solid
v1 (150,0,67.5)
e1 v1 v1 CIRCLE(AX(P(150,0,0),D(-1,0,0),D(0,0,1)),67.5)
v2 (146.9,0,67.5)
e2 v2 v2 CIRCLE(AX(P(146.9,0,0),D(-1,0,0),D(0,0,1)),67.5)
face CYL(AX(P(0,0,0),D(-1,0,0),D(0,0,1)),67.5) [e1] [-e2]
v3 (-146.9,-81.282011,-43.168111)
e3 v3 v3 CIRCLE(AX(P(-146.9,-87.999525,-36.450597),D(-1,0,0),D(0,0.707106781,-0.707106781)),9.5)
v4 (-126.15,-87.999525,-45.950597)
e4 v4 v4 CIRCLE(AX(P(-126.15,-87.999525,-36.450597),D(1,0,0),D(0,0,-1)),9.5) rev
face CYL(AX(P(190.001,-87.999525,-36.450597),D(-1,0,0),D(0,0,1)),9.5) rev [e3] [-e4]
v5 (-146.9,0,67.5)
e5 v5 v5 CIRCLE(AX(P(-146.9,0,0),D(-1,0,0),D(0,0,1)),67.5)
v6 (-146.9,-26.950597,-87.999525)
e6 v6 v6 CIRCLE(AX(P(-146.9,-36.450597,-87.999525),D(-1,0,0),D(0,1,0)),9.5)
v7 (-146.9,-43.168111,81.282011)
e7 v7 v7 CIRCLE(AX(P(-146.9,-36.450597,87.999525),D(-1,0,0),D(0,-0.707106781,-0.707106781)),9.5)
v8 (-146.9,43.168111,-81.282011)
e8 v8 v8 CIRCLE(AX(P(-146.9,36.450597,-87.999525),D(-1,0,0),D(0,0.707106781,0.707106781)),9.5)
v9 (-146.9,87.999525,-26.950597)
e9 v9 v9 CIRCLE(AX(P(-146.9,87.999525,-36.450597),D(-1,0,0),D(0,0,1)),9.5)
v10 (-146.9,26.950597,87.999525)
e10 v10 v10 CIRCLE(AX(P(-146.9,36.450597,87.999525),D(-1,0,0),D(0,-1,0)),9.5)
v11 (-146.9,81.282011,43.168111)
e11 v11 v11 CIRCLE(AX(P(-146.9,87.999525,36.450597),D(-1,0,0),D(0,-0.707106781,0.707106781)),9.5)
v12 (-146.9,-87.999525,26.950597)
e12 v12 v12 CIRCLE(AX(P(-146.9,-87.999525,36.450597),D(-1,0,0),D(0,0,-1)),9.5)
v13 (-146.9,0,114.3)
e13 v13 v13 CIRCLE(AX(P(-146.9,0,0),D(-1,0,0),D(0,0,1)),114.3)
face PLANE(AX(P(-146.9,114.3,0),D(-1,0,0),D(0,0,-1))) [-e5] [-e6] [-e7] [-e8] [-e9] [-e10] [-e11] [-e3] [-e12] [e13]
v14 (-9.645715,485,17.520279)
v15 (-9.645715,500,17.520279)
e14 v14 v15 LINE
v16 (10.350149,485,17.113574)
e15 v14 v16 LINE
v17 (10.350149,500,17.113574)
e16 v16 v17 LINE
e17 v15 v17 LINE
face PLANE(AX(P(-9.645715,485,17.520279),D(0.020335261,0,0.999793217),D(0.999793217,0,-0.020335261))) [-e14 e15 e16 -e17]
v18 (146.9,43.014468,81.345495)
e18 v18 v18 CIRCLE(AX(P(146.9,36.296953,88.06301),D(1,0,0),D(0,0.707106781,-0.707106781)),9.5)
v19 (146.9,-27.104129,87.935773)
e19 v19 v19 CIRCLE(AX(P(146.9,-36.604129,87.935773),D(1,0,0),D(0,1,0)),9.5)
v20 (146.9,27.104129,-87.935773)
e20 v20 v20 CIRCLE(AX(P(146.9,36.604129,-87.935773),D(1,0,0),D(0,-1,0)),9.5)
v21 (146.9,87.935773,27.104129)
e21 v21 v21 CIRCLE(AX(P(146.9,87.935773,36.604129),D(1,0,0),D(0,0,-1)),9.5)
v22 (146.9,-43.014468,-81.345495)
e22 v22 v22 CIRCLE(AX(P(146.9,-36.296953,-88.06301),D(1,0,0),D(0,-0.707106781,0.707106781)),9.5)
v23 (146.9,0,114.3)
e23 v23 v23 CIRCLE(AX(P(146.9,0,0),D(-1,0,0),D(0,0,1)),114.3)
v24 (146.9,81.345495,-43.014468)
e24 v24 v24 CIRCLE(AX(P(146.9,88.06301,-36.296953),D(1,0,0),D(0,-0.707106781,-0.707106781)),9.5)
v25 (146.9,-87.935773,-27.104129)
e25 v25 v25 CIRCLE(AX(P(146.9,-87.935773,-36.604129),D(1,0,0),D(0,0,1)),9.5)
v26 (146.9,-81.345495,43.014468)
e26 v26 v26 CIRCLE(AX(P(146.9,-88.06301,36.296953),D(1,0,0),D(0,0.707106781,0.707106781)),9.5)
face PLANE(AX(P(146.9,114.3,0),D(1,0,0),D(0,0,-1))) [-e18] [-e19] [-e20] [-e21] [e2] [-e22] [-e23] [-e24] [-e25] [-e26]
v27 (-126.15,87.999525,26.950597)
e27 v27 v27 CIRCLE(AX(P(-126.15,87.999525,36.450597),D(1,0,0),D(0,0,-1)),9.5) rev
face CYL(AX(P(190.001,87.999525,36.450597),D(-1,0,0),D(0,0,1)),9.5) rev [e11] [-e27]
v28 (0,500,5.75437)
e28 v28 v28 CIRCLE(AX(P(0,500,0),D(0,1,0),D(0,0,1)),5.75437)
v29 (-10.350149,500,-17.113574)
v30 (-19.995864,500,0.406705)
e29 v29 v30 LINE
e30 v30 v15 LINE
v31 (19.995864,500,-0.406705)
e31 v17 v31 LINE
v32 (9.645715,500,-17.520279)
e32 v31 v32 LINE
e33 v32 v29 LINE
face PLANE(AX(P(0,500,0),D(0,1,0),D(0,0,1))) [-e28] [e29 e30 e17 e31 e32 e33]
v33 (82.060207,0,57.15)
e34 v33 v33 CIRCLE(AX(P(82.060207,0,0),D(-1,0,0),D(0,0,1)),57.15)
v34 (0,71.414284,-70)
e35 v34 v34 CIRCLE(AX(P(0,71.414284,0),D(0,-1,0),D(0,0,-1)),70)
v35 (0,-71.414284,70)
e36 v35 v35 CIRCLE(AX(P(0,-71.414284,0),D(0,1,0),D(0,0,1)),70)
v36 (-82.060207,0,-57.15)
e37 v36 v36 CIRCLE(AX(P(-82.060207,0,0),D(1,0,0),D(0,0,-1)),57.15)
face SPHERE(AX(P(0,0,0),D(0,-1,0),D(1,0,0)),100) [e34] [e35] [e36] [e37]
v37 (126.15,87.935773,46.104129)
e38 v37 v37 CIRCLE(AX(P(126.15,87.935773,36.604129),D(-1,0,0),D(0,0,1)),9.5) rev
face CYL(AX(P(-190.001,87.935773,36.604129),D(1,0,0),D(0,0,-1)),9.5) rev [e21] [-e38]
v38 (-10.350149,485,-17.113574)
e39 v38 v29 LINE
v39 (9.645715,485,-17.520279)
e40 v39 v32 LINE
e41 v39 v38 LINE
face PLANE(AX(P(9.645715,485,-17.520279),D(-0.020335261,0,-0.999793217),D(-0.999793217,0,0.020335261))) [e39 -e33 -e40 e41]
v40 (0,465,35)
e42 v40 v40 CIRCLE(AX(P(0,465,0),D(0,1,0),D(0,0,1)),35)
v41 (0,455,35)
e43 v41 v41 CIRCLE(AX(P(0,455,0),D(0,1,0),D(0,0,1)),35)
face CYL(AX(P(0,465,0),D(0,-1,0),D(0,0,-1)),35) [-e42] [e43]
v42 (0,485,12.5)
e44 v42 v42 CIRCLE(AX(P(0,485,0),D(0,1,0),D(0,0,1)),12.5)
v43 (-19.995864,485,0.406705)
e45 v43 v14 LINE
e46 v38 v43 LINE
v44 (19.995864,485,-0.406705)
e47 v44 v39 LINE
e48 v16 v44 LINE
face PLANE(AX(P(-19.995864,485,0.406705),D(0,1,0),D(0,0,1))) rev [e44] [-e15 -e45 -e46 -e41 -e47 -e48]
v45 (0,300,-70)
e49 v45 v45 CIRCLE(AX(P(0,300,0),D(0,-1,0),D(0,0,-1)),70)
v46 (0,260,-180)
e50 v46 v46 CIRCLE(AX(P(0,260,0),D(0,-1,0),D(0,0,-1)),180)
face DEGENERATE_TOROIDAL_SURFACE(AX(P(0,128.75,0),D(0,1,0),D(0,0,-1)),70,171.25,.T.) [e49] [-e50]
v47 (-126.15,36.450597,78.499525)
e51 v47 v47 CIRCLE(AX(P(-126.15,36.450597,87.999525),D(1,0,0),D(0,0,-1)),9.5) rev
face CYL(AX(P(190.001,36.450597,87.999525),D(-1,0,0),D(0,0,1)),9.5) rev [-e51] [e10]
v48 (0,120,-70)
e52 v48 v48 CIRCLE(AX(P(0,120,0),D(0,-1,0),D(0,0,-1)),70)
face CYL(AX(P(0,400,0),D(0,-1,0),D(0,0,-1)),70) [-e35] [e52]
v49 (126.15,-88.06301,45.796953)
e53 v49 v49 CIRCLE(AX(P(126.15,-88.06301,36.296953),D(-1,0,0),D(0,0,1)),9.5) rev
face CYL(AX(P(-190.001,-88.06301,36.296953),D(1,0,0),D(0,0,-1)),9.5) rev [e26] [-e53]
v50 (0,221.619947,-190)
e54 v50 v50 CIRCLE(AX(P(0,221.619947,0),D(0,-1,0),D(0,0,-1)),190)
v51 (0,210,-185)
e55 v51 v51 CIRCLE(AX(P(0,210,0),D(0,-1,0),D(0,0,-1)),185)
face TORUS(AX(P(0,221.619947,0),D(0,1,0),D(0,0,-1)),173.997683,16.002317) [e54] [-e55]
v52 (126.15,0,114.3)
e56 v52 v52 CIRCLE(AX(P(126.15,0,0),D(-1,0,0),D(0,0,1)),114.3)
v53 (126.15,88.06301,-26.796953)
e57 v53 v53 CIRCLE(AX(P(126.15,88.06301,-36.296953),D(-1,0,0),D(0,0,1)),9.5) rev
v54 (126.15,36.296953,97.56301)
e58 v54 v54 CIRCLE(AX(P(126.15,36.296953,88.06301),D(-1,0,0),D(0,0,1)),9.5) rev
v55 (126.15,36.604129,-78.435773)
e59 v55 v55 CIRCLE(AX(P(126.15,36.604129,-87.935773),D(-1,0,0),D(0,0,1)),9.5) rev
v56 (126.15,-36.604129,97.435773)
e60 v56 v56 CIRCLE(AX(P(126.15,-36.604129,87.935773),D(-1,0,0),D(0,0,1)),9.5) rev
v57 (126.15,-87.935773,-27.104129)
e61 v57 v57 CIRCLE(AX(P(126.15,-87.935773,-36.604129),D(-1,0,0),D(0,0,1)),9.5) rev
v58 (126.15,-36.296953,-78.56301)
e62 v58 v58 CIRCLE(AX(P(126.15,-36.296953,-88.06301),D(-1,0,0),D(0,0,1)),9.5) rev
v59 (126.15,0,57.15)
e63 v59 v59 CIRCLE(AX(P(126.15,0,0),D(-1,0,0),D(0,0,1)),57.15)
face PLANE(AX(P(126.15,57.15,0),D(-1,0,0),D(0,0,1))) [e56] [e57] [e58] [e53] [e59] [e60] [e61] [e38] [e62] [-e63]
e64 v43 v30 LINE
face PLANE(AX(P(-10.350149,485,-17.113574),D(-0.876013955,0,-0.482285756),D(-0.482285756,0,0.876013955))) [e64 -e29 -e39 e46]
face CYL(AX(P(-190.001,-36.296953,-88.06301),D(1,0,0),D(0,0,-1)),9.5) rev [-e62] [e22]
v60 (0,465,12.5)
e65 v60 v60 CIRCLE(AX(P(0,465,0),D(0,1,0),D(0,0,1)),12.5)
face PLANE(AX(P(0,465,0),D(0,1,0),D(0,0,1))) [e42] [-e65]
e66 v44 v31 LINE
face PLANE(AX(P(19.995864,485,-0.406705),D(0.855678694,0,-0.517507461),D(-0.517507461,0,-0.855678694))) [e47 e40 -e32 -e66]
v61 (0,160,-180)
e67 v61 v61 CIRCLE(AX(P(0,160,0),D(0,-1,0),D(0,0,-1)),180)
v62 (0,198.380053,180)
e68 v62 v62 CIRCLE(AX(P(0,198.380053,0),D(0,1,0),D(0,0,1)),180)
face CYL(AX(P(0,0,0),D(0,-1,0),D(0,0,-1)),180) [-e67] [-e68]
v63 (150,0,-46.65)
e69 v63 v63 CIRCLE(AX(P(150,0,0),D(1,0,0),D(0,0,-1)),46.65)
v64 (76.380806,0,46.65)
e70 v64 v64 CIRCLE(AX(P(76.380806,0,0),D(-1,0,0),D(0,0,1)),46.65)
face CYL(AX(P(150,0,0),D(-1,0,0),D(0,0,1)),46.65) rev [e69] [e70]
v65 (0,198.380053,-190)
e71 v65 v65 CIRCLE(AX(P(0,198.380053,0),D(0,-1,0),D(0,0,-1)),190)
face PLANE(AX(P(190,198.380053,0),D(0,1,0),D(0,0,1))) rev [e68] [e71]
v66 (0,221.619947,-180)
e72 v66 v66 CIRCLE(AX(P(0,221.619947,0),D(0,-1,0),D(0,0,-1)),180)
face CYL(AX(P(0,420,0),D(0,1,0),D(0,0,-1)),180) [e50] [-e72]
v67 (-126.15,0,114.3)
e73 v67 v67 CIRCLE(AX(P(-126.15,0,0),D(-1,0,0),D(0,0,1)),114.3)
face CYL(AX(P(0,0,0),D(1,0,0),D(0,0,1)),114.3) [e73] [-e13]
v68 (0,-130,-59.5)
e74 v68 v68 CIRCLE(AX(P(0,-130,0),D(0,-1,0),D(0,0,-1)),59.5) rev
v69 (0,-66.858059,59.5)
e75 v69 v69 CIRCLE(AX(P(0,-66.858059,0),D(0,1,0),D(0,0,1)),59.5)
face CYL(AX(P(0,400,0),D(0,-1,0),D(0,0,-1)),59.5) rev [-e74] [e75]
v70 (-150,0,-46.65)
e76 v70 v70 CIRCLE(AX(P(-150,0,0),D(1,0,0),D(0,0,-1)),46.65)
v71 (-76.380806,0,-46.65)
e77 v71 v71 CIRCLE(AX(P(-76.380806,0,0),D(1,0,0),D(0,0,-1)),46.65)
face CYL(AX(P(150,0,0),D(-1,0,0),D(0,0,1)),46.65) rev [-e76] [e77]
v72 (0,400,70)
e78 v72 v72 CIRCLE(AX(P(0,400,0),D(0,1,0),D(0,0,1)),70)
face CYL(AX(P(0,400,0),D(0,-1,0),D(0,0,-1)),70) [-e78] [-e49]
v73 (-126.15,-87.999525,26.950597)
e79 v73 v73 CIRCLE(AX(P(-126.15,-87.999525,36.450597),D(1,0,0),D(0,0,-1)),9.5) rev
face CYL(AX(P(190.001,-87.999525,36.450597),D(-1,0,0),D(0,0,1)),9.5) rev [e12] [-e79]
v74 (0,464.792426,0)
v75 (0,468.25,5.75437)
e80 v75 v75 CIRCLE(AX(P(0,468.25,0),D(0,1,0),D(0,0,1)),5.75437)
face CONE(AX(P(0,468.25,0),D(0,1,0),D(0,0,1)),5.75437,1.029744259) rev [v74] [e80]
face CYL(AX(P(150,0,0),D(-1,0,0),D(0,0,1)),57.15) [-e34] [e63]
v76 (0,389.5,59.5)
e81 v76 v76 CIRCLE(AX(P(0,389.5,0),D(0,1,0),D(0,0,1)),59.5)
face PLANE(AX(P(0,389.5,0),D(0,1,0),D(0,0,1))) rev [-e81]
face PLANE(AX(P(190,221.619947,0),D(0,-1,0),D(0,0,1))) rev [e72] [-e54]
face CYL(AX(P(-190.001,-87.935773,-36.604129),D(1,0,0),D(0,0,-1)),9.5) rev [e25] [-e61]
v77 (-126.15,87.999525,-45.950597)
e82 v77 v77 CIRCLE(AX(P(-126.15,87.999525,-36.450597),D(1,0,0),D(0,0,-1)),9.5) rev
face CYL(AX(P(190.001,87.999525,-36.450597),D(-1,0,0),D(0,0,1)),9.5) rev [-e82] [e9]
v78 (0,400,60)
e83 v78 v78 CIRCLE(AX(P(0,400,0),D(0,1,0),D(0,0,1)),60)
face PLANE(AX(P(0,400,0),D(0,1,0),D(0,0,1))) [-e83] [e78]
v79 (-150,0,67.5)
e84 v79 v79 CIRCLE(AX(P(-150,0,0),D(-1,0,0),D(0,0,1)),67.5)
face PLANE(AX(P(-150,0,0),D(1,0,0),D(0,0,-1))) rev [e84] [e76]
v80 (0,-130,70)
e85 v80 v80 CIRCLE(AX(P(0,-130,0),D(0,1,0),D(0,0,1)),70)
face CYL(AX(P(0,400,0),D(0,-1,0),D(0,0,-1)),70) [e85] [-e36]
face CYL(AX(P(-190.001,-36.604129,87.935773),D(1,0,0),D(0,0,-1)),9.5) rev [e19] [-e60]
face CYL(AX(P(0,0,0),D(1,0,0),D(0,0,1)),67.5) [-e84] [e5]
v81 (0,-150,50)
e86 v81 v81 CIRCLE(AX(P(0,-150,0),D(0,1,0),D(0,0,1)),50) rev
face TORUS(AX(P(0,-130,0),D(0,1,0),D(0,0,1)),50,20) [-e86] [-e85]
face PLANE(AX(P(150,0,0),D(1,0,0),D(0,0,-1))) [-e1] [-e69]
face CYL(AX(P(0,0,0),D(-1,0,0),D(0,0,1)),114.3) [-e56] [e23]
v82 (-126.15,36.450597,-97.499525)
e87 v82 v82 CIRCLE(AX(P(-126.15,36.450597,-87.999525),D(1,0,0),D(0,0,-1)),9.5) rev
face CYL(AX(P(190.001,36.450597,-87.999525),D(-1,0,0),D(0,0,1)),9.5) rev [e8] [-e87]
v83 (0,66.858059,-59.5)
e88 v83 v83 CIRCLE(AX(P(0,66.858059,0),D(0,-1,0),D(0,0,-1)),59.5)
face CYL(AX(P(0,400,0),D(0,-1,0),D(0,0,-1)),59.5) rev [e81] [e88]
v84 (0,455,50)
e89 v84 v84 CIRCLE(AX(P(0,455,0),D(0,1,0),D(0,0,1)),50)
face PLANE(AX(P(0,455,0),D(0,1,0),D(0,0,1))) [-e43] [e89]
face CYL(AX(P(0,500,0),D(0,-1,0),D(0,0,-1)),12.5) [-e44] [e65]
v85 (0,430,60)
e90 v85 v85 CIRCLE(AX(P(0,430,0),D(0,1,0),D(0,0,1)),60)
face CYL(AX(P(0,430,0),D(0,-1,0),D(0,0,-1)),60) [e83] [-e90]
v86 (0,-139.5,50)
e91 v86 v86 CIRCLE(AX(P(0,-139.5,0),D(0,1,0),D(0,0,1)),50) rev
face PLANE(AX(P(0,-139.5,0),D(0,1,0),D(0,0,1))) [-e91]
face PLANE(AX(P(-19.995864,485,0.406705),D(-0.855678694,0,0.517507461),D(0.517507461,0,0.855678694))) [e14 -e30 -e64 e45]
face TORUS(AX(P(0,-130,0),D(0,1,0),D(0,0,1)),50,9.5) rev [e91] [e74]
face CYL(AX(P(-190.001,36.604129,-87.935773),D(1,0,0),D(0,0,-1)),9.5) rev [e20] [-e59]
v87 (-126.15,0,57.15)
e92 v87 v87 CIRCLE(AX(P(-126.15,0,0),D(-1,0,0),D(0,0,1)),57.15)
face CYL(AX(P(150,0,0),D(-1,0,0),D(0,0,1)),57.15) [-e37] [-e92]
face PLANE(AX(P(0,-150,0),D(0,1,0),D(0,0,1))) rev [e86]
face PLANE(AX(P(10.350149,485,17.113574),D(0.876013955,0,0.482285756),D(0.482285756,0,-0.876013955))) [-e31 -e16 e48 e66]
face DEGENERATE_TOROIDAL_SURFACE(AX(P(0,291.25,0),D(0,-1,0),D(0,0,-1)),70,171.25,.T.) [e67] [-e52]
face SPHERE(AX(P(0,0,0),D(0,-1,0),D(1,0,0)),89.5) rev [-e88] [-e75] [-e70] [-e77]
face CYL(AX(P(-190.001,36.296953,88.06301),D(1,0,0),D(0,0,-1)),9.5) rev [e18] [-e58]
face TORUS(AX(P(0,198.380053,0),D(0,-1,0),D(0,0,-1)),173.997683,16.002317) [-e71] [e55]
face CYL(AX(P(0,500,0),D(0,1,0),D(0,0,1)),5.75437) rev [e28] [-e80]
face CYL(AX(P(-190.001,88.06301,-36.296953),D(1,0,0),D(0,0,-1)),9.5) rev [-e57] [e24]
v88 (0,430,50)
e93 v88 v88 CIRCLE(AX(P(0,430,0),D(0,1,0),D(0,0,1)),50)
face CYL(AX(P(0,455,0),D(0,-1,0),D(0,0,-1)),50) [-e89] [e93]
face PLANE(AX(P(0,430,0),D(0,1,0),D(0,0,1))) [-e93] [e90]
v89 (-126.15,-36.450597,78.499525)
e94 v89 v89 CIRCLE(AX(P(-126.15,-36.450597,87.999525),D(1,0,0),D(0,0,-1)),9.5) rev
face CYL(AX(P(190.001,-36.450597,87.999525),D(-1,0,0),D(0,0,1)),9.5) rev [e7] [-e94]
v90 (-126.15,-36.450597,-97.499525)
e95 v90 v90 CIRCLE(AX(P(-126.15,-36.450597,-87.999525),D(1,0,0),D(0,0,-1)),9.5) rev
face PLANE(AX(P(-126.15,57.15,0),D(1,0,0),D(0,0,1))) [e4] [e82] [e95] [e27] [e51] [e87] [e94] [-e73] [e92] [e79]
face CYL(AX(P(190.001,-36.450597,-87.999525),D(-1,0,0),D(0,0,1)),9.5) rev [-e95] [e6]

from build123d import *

# Parameters (mm, degrees)
SKETCH1_R                   = 57.15
BASE_EXTRUDE_DEPTH          = 150
BOSS_EXTRUDE1_DEPTH         = 400
BOSS_EXTRUDE1_DEPTH_BACK    = 150
SKETCH2_R                   = 70
FILLET1_R                   = 20
SHELL1_START                = -150
SHELL1_OUTLINE_R            = 46.65
SHELL1_DEPTH                = 300
SKETCH6_R                   = 60
BOSS_EXTRUDE2_DEPTH         = 30
SKETCH7_R                   = 50
BOSS_EXTRUDE3_DEPTH         = 25
SKETCH8_R                   = 35
BOSS_EXTRUDE4_DEPTH         = 10
SKETCH9_R                   = 12.5
BOSS_EXTRUDE5_DEPTH         = 35
BOSS_EXTRUDE6_DEPTH         = 15
CUT_EXTRUDE1_REACH          = 634.14
SKETCH14_R                  = 9.5
CIRPATTERN1_COUNT           = 8
CUT_EXTRUDE2_REACH          = 634.14
SKETCH15_R                  = 9.5
CIRPATTERN2_COUNT           = 8
F_1_2_20_TAPPED_HOLE1_D     = 11.50874
F_1_2_20_TAPPED_HOLE1_DEPTH = 31.75
F_1_2_20_TAPPED_HOLE1_TIP   = 3.45757432


with BuildPart() as part:
    # Sketch1 → Base-Extrude (new, symmetric)
    with BuildSketch(Plane(origin=(0, 0, 0), x_dir=(0, 0, -1), z_dir=(1, 0, 0))):
        Circle(SKETCH1_R)
    extrude(amount=BASE_EXTRUDE_DEPTH, both=True)

    # Sketch2 → Boss-Extrude1 (add, two sides: drawn at the far end of the back side and taken through both)
    with BuildSketch(Plane(origin=(0, 0, 0), x_dir=(1, 0, 0), z_dir=(0, 1, 0)).offset(-BOSS_EXTRUDE1_DEPTH_BACK)):
        with Locations(Location((0, 0, 0), (0, 0, 270))):
            Circle(SKETCH2_R)
    extrude(amount=BOSS_EXTRUDE1_DEPTH + BOSS_EXTRUDE1_DEPTH_BACK)

    # Sketch3 → Boss-Revolve1 (revolve)
    with BuildSketch(Plane.XY):
        with BuildLine():
            Line((0, -100), (0, 100))
            ThreePointArc((0, 100), (100, 0), (0, -100))
        make_face()
    revolve(axis=Axis((0, -115.862970753, 0), (0, 1, 0)))

    # Fillet1
    fillet1_edges = [part.edges().sort_by_distance(p)[0] for p in [
        (0, -150, -70),
    ]]
    fillet(fillet1_edges, radius=FILLET1_R)

    # Shell1: read off the stored shape, not the designer's step
    # Shell1 outline → Shell1 (cut)
    with BuildSketch(Plane.YZ.offset(SHELL1_START)):
        Circle(SHELL1_OUTLINE_R)
    extrude(amount=SHELL1_DEPTH, mode=Mode.SUBTRACT)

    # Shell1 2 outline → Shell1 2 (revolve, cut)
    with BuildSketch(Plane.XY):
        with BuildLine():
            Line((59.499999977, 66.858058621), (59.5, 389.5))
            Line((59.5, 389.5), (0, 389.5))
            Line((0, 389.5), (0, -139.5))
            Line((0, -139.5), (50, -139.5))
            ThreePointArc((50, -139.5), (56.717514421, -136.717514421), (59.5, -130))
            Line((59.5, -130), (59.499999977, -66.858058621))
            ThreePointArc((59.499999977, -66.858058621), (89.5, 0), (59.499999977, 66.858058621))
        make_face()
    revolve(axis=Axis((0, 0, 0), (0, 1, 0)), mode=Mode.SUBTRACT)

    # Sketch4 → Boss-Revolve2 (revolve)
    with BuildSketch(Plane.XY, mode=Mode.PRIVATE) as boss_revolve2_sk:
        with BuildLine():
            Line((70, 210), (180, 210))
            Line((180, 210), (180, 160))
            ThreePointArc((180, 160), (128.523499554, 130.310376228), (70, 120))
            Line((70, 120), (70, 210))
        make_face()
    revolve(boss_revolve2_sk.sketch.rotate(Axis((0, 0, 0), (0, 1, 0)), 90), axis=Axis((0, 0, 0), (0, 1, 0)))

    # Sketch5 → Boss-Revolve3 (revolve)
    with BuildSketch(Plane.XY, mode=Mode.PRIVATE) as boss_revolve3_sk:
        with BuildLine():
            Line((190, 198.380052899), (180, 198.380052899))
            Line((180, 198.380052899), (180, 210))
            Line((180, 210), (185, 210))
            ThreePointArc((185, 210), (188.696946821, 204.705066152), (190, 198.380052899))
        make_face()
    revolve(boss_revolve3_sk.sketch.rotate(Axis((0, 0, 0), (0, 1, 0)), 90), axis=Axis((0, 0, 0), (0, 1, 0)))

    # Mirror1: read off the stored shape, not the designer's step
    # Mirror1 outline → Mirror1 (revolve)
    with BuildSketch(Plane.XY):
        with BuildLine():
            Line((70, 210), (185, 210))
            ThreePointArc((185, 210), (188.696946821, 215.294933847), (190, 221.619947101))
            Line((190, 221.619947101), (180, 221.619947101))
            Line((180, 221.619947101), (180, 260))
            ThreePointArc((180, 260), (128.523499554, 289.689623772), (70, 300))
            Line((70, 300), (70, 210))
        make_face()
    revolve(axis=Axis((0, 0, 0), (0, 1, 0)))

    # Sketch6 → Boss-Extrude2 (add)
    with BuildSketch(Plane(origin=(0, 400, 0), x_dir=(-1, 0, 0), z_dir=(0, 1, 0))):
        with Locations(Location((0, 0, 0), (0, 0, 90))):
            Circle(SKETCH6_R)
    extrude(amount=BOSS_EXTRUDE2_DEPTH)

    # Sketch7 → Boss-Extrude3 (add)
    with BuildSketch(Plane(origin=(0, 430, 0), x_dir=(-1, 0, 0), z_dir=(0, 1, 0))):
        with Locations(Location((0, 0, 0), (0, 0, 90))):
            Circle(SKETCH7_R)
    extrude(amount=BOSS_EXTRUDE3_DEPTH)

    # Sketch8 → Boss-Extrude4 (add)
    with BuildSketch(Plane(origin=(0, 455, 0), x_dir=(-1, 0, 0), z_dir=(0, 1, 0))):
        with Locations(Location((0, 0, 0), (0, 0, 90))):
            Circle(SKETCH8_R)
    extrude(amount=BOSS_EXTRUDE4_DEPTH)

    # Sketch9 → Boss-Extrude5 (add)
    with BuildSketch(Plane(origin=(0, 465, 0), x_dir=(-1, 0, 0), z_dir=(0, 1, 0))):
        with Locations(Location((0, 0, 0), (0, 0, 90))):
            Circle(SKETCH9_R)
    extrude(amount=BOSS_EXTRUDE5_DEPTH)

    # hexagon2 → Boss-Extrude6 (add)
    with BuildSketch(Plane(origin=(-2.358099014, 500, -8.084910906), x_dir=(-1, 0, 0), z_dir=(0, 1, 0))):
        Polygon((17.63776533, 8.49161613), (7.287616102, 25.605190011), (-12.708248242, 25.198484787), (-22.353963358, 7.678205682), (-12.003814131, -9.435368198), (7.992050213, -9.028662974), align=None)
    extrude(amount=-BOSS_EXTRUDE6_DEPTH)

    # Sketch13 → Boss-Revolve4 (revolve)
    with BuildSketch(Plane.XY, mode=Mode.PRIVATE) as boss_revolve4_sk:
        Polygon((126.15, 57.15), (126.15, 114.3), (146.9, 114.3), (146.9, 67.5), (150, 67.5), (150, 57.15), align=None)
    boss_revolve4 = revolve(boss_revolve4_sk.sketch.rotate(Axis((0, 0, 0), (1, 0, 0)), 90), axis=Axis((0, 0, 0), (1, 0, 0)))

    # Mirror2: Boss-Revolve4 across plane
    add(boss_revolve4.mirror(Plane(origin=(0, 0, 0), x_dir=(0, 0, 1), z_dir=(1, 0, 0))))

    # Sketch14 → Cut-Extrude1 (cut, up to next)
    with BuildSketch(Plane(origin=(146.9, 0, 0), x_dir=(0, 0, -1), z_dir=(1, 0, 0)), mode=Mode.PRIVATE) as cut_extrude1_sk1:
        with Locations((-36.604129483, 87.93577318)):
            Circle(SKETCH14_R)
    cut_extrude1_tool1 = extrude(cut_extrude1_sk1.sketch, amount=-CUT_EXTRUDE1_REACH, mode=Mode.PRIVATE) & part.part
    cut_extrude1 = cut_extrude1_tool1.solids().sort_by_distance((146.9, 87.935773, 36.604129))[0]
    add(cut_extrude1, mode=Mode.SUBTRACT)

    # CirPattern1: Cut-Extrude1 ×8 about axis
    cirpattern1_axis = Axis((0, 0, 0), (1, 0, 0))
    for i in range(1, CIRPATTERN1_COUNT):
        add(cut_extrude1.rotate(cirpattern1_axis, i * 360 / CIRPATTERN1_COUNT), mode=Mode.SUBTRACT)

    # Sketch15 → Cut-Extrude2 (cut, up to next)
    with BuildSketch(Plane.ZY.offset(146.9), mode=Mode.PRIVATE) as cut_extrude2_sk1:
        with Locations((-36.450596933, 87.999525472)):
            Circle(SKETCH15_R)
    cut_extrude2_tool1 = extrude(cut_extrude2_sk1.sketch, amount=-CUT_EXTRUDE2_REACH, mode=Mode.PRIVATE) & part.part
    cut_extrude2 = cut_extrude2_tool1.solids().sort_by_distance((-146.9, 87.999525, -36.450597))[0]
    add(cut_extrude2, mode=Mode.SUBTRACT)

    # CirPattern2: Cut-Extrude2 ×8 about axis
    cirpattern2_axis = Axis((0, 0, 0), (1, 0, 0))
    for i in range(1, CIRPATTERN2_COUNT):
        add(cut_extrude2.rotate(cirpattern2_axis, i * 360 / CIRPATTERN2_COUNT), mode=Mode.SUBTRACT)

    # 1/2-20 Tapped Hole1
    with Locations(Plane(origin=(0, 500, 0), x_dir=(-1, 0, 0), z_dir=(0, 1, 0))):
        with Locations((0, 0)):
            Hole(F_1_2_20_TAPPED_HOLE1_D / 2, depth=F_1_2_20_TAPPED_HOLE1_DEPTH)
            with Locations((0, 0, -(F_1_2_20_TAPPED_HOLE1_DEPTH + F_1_2_20_TAPPED_HOLE1_TIP / 2))):  # 118° drill point
                Cone(0, F_1_2_20_TAPPED_HOLE1_D / 2, F_1_2_20_TAPPED_HOLE1_TIP, mode=Mode.SUBTRACT)


solid = part.part
